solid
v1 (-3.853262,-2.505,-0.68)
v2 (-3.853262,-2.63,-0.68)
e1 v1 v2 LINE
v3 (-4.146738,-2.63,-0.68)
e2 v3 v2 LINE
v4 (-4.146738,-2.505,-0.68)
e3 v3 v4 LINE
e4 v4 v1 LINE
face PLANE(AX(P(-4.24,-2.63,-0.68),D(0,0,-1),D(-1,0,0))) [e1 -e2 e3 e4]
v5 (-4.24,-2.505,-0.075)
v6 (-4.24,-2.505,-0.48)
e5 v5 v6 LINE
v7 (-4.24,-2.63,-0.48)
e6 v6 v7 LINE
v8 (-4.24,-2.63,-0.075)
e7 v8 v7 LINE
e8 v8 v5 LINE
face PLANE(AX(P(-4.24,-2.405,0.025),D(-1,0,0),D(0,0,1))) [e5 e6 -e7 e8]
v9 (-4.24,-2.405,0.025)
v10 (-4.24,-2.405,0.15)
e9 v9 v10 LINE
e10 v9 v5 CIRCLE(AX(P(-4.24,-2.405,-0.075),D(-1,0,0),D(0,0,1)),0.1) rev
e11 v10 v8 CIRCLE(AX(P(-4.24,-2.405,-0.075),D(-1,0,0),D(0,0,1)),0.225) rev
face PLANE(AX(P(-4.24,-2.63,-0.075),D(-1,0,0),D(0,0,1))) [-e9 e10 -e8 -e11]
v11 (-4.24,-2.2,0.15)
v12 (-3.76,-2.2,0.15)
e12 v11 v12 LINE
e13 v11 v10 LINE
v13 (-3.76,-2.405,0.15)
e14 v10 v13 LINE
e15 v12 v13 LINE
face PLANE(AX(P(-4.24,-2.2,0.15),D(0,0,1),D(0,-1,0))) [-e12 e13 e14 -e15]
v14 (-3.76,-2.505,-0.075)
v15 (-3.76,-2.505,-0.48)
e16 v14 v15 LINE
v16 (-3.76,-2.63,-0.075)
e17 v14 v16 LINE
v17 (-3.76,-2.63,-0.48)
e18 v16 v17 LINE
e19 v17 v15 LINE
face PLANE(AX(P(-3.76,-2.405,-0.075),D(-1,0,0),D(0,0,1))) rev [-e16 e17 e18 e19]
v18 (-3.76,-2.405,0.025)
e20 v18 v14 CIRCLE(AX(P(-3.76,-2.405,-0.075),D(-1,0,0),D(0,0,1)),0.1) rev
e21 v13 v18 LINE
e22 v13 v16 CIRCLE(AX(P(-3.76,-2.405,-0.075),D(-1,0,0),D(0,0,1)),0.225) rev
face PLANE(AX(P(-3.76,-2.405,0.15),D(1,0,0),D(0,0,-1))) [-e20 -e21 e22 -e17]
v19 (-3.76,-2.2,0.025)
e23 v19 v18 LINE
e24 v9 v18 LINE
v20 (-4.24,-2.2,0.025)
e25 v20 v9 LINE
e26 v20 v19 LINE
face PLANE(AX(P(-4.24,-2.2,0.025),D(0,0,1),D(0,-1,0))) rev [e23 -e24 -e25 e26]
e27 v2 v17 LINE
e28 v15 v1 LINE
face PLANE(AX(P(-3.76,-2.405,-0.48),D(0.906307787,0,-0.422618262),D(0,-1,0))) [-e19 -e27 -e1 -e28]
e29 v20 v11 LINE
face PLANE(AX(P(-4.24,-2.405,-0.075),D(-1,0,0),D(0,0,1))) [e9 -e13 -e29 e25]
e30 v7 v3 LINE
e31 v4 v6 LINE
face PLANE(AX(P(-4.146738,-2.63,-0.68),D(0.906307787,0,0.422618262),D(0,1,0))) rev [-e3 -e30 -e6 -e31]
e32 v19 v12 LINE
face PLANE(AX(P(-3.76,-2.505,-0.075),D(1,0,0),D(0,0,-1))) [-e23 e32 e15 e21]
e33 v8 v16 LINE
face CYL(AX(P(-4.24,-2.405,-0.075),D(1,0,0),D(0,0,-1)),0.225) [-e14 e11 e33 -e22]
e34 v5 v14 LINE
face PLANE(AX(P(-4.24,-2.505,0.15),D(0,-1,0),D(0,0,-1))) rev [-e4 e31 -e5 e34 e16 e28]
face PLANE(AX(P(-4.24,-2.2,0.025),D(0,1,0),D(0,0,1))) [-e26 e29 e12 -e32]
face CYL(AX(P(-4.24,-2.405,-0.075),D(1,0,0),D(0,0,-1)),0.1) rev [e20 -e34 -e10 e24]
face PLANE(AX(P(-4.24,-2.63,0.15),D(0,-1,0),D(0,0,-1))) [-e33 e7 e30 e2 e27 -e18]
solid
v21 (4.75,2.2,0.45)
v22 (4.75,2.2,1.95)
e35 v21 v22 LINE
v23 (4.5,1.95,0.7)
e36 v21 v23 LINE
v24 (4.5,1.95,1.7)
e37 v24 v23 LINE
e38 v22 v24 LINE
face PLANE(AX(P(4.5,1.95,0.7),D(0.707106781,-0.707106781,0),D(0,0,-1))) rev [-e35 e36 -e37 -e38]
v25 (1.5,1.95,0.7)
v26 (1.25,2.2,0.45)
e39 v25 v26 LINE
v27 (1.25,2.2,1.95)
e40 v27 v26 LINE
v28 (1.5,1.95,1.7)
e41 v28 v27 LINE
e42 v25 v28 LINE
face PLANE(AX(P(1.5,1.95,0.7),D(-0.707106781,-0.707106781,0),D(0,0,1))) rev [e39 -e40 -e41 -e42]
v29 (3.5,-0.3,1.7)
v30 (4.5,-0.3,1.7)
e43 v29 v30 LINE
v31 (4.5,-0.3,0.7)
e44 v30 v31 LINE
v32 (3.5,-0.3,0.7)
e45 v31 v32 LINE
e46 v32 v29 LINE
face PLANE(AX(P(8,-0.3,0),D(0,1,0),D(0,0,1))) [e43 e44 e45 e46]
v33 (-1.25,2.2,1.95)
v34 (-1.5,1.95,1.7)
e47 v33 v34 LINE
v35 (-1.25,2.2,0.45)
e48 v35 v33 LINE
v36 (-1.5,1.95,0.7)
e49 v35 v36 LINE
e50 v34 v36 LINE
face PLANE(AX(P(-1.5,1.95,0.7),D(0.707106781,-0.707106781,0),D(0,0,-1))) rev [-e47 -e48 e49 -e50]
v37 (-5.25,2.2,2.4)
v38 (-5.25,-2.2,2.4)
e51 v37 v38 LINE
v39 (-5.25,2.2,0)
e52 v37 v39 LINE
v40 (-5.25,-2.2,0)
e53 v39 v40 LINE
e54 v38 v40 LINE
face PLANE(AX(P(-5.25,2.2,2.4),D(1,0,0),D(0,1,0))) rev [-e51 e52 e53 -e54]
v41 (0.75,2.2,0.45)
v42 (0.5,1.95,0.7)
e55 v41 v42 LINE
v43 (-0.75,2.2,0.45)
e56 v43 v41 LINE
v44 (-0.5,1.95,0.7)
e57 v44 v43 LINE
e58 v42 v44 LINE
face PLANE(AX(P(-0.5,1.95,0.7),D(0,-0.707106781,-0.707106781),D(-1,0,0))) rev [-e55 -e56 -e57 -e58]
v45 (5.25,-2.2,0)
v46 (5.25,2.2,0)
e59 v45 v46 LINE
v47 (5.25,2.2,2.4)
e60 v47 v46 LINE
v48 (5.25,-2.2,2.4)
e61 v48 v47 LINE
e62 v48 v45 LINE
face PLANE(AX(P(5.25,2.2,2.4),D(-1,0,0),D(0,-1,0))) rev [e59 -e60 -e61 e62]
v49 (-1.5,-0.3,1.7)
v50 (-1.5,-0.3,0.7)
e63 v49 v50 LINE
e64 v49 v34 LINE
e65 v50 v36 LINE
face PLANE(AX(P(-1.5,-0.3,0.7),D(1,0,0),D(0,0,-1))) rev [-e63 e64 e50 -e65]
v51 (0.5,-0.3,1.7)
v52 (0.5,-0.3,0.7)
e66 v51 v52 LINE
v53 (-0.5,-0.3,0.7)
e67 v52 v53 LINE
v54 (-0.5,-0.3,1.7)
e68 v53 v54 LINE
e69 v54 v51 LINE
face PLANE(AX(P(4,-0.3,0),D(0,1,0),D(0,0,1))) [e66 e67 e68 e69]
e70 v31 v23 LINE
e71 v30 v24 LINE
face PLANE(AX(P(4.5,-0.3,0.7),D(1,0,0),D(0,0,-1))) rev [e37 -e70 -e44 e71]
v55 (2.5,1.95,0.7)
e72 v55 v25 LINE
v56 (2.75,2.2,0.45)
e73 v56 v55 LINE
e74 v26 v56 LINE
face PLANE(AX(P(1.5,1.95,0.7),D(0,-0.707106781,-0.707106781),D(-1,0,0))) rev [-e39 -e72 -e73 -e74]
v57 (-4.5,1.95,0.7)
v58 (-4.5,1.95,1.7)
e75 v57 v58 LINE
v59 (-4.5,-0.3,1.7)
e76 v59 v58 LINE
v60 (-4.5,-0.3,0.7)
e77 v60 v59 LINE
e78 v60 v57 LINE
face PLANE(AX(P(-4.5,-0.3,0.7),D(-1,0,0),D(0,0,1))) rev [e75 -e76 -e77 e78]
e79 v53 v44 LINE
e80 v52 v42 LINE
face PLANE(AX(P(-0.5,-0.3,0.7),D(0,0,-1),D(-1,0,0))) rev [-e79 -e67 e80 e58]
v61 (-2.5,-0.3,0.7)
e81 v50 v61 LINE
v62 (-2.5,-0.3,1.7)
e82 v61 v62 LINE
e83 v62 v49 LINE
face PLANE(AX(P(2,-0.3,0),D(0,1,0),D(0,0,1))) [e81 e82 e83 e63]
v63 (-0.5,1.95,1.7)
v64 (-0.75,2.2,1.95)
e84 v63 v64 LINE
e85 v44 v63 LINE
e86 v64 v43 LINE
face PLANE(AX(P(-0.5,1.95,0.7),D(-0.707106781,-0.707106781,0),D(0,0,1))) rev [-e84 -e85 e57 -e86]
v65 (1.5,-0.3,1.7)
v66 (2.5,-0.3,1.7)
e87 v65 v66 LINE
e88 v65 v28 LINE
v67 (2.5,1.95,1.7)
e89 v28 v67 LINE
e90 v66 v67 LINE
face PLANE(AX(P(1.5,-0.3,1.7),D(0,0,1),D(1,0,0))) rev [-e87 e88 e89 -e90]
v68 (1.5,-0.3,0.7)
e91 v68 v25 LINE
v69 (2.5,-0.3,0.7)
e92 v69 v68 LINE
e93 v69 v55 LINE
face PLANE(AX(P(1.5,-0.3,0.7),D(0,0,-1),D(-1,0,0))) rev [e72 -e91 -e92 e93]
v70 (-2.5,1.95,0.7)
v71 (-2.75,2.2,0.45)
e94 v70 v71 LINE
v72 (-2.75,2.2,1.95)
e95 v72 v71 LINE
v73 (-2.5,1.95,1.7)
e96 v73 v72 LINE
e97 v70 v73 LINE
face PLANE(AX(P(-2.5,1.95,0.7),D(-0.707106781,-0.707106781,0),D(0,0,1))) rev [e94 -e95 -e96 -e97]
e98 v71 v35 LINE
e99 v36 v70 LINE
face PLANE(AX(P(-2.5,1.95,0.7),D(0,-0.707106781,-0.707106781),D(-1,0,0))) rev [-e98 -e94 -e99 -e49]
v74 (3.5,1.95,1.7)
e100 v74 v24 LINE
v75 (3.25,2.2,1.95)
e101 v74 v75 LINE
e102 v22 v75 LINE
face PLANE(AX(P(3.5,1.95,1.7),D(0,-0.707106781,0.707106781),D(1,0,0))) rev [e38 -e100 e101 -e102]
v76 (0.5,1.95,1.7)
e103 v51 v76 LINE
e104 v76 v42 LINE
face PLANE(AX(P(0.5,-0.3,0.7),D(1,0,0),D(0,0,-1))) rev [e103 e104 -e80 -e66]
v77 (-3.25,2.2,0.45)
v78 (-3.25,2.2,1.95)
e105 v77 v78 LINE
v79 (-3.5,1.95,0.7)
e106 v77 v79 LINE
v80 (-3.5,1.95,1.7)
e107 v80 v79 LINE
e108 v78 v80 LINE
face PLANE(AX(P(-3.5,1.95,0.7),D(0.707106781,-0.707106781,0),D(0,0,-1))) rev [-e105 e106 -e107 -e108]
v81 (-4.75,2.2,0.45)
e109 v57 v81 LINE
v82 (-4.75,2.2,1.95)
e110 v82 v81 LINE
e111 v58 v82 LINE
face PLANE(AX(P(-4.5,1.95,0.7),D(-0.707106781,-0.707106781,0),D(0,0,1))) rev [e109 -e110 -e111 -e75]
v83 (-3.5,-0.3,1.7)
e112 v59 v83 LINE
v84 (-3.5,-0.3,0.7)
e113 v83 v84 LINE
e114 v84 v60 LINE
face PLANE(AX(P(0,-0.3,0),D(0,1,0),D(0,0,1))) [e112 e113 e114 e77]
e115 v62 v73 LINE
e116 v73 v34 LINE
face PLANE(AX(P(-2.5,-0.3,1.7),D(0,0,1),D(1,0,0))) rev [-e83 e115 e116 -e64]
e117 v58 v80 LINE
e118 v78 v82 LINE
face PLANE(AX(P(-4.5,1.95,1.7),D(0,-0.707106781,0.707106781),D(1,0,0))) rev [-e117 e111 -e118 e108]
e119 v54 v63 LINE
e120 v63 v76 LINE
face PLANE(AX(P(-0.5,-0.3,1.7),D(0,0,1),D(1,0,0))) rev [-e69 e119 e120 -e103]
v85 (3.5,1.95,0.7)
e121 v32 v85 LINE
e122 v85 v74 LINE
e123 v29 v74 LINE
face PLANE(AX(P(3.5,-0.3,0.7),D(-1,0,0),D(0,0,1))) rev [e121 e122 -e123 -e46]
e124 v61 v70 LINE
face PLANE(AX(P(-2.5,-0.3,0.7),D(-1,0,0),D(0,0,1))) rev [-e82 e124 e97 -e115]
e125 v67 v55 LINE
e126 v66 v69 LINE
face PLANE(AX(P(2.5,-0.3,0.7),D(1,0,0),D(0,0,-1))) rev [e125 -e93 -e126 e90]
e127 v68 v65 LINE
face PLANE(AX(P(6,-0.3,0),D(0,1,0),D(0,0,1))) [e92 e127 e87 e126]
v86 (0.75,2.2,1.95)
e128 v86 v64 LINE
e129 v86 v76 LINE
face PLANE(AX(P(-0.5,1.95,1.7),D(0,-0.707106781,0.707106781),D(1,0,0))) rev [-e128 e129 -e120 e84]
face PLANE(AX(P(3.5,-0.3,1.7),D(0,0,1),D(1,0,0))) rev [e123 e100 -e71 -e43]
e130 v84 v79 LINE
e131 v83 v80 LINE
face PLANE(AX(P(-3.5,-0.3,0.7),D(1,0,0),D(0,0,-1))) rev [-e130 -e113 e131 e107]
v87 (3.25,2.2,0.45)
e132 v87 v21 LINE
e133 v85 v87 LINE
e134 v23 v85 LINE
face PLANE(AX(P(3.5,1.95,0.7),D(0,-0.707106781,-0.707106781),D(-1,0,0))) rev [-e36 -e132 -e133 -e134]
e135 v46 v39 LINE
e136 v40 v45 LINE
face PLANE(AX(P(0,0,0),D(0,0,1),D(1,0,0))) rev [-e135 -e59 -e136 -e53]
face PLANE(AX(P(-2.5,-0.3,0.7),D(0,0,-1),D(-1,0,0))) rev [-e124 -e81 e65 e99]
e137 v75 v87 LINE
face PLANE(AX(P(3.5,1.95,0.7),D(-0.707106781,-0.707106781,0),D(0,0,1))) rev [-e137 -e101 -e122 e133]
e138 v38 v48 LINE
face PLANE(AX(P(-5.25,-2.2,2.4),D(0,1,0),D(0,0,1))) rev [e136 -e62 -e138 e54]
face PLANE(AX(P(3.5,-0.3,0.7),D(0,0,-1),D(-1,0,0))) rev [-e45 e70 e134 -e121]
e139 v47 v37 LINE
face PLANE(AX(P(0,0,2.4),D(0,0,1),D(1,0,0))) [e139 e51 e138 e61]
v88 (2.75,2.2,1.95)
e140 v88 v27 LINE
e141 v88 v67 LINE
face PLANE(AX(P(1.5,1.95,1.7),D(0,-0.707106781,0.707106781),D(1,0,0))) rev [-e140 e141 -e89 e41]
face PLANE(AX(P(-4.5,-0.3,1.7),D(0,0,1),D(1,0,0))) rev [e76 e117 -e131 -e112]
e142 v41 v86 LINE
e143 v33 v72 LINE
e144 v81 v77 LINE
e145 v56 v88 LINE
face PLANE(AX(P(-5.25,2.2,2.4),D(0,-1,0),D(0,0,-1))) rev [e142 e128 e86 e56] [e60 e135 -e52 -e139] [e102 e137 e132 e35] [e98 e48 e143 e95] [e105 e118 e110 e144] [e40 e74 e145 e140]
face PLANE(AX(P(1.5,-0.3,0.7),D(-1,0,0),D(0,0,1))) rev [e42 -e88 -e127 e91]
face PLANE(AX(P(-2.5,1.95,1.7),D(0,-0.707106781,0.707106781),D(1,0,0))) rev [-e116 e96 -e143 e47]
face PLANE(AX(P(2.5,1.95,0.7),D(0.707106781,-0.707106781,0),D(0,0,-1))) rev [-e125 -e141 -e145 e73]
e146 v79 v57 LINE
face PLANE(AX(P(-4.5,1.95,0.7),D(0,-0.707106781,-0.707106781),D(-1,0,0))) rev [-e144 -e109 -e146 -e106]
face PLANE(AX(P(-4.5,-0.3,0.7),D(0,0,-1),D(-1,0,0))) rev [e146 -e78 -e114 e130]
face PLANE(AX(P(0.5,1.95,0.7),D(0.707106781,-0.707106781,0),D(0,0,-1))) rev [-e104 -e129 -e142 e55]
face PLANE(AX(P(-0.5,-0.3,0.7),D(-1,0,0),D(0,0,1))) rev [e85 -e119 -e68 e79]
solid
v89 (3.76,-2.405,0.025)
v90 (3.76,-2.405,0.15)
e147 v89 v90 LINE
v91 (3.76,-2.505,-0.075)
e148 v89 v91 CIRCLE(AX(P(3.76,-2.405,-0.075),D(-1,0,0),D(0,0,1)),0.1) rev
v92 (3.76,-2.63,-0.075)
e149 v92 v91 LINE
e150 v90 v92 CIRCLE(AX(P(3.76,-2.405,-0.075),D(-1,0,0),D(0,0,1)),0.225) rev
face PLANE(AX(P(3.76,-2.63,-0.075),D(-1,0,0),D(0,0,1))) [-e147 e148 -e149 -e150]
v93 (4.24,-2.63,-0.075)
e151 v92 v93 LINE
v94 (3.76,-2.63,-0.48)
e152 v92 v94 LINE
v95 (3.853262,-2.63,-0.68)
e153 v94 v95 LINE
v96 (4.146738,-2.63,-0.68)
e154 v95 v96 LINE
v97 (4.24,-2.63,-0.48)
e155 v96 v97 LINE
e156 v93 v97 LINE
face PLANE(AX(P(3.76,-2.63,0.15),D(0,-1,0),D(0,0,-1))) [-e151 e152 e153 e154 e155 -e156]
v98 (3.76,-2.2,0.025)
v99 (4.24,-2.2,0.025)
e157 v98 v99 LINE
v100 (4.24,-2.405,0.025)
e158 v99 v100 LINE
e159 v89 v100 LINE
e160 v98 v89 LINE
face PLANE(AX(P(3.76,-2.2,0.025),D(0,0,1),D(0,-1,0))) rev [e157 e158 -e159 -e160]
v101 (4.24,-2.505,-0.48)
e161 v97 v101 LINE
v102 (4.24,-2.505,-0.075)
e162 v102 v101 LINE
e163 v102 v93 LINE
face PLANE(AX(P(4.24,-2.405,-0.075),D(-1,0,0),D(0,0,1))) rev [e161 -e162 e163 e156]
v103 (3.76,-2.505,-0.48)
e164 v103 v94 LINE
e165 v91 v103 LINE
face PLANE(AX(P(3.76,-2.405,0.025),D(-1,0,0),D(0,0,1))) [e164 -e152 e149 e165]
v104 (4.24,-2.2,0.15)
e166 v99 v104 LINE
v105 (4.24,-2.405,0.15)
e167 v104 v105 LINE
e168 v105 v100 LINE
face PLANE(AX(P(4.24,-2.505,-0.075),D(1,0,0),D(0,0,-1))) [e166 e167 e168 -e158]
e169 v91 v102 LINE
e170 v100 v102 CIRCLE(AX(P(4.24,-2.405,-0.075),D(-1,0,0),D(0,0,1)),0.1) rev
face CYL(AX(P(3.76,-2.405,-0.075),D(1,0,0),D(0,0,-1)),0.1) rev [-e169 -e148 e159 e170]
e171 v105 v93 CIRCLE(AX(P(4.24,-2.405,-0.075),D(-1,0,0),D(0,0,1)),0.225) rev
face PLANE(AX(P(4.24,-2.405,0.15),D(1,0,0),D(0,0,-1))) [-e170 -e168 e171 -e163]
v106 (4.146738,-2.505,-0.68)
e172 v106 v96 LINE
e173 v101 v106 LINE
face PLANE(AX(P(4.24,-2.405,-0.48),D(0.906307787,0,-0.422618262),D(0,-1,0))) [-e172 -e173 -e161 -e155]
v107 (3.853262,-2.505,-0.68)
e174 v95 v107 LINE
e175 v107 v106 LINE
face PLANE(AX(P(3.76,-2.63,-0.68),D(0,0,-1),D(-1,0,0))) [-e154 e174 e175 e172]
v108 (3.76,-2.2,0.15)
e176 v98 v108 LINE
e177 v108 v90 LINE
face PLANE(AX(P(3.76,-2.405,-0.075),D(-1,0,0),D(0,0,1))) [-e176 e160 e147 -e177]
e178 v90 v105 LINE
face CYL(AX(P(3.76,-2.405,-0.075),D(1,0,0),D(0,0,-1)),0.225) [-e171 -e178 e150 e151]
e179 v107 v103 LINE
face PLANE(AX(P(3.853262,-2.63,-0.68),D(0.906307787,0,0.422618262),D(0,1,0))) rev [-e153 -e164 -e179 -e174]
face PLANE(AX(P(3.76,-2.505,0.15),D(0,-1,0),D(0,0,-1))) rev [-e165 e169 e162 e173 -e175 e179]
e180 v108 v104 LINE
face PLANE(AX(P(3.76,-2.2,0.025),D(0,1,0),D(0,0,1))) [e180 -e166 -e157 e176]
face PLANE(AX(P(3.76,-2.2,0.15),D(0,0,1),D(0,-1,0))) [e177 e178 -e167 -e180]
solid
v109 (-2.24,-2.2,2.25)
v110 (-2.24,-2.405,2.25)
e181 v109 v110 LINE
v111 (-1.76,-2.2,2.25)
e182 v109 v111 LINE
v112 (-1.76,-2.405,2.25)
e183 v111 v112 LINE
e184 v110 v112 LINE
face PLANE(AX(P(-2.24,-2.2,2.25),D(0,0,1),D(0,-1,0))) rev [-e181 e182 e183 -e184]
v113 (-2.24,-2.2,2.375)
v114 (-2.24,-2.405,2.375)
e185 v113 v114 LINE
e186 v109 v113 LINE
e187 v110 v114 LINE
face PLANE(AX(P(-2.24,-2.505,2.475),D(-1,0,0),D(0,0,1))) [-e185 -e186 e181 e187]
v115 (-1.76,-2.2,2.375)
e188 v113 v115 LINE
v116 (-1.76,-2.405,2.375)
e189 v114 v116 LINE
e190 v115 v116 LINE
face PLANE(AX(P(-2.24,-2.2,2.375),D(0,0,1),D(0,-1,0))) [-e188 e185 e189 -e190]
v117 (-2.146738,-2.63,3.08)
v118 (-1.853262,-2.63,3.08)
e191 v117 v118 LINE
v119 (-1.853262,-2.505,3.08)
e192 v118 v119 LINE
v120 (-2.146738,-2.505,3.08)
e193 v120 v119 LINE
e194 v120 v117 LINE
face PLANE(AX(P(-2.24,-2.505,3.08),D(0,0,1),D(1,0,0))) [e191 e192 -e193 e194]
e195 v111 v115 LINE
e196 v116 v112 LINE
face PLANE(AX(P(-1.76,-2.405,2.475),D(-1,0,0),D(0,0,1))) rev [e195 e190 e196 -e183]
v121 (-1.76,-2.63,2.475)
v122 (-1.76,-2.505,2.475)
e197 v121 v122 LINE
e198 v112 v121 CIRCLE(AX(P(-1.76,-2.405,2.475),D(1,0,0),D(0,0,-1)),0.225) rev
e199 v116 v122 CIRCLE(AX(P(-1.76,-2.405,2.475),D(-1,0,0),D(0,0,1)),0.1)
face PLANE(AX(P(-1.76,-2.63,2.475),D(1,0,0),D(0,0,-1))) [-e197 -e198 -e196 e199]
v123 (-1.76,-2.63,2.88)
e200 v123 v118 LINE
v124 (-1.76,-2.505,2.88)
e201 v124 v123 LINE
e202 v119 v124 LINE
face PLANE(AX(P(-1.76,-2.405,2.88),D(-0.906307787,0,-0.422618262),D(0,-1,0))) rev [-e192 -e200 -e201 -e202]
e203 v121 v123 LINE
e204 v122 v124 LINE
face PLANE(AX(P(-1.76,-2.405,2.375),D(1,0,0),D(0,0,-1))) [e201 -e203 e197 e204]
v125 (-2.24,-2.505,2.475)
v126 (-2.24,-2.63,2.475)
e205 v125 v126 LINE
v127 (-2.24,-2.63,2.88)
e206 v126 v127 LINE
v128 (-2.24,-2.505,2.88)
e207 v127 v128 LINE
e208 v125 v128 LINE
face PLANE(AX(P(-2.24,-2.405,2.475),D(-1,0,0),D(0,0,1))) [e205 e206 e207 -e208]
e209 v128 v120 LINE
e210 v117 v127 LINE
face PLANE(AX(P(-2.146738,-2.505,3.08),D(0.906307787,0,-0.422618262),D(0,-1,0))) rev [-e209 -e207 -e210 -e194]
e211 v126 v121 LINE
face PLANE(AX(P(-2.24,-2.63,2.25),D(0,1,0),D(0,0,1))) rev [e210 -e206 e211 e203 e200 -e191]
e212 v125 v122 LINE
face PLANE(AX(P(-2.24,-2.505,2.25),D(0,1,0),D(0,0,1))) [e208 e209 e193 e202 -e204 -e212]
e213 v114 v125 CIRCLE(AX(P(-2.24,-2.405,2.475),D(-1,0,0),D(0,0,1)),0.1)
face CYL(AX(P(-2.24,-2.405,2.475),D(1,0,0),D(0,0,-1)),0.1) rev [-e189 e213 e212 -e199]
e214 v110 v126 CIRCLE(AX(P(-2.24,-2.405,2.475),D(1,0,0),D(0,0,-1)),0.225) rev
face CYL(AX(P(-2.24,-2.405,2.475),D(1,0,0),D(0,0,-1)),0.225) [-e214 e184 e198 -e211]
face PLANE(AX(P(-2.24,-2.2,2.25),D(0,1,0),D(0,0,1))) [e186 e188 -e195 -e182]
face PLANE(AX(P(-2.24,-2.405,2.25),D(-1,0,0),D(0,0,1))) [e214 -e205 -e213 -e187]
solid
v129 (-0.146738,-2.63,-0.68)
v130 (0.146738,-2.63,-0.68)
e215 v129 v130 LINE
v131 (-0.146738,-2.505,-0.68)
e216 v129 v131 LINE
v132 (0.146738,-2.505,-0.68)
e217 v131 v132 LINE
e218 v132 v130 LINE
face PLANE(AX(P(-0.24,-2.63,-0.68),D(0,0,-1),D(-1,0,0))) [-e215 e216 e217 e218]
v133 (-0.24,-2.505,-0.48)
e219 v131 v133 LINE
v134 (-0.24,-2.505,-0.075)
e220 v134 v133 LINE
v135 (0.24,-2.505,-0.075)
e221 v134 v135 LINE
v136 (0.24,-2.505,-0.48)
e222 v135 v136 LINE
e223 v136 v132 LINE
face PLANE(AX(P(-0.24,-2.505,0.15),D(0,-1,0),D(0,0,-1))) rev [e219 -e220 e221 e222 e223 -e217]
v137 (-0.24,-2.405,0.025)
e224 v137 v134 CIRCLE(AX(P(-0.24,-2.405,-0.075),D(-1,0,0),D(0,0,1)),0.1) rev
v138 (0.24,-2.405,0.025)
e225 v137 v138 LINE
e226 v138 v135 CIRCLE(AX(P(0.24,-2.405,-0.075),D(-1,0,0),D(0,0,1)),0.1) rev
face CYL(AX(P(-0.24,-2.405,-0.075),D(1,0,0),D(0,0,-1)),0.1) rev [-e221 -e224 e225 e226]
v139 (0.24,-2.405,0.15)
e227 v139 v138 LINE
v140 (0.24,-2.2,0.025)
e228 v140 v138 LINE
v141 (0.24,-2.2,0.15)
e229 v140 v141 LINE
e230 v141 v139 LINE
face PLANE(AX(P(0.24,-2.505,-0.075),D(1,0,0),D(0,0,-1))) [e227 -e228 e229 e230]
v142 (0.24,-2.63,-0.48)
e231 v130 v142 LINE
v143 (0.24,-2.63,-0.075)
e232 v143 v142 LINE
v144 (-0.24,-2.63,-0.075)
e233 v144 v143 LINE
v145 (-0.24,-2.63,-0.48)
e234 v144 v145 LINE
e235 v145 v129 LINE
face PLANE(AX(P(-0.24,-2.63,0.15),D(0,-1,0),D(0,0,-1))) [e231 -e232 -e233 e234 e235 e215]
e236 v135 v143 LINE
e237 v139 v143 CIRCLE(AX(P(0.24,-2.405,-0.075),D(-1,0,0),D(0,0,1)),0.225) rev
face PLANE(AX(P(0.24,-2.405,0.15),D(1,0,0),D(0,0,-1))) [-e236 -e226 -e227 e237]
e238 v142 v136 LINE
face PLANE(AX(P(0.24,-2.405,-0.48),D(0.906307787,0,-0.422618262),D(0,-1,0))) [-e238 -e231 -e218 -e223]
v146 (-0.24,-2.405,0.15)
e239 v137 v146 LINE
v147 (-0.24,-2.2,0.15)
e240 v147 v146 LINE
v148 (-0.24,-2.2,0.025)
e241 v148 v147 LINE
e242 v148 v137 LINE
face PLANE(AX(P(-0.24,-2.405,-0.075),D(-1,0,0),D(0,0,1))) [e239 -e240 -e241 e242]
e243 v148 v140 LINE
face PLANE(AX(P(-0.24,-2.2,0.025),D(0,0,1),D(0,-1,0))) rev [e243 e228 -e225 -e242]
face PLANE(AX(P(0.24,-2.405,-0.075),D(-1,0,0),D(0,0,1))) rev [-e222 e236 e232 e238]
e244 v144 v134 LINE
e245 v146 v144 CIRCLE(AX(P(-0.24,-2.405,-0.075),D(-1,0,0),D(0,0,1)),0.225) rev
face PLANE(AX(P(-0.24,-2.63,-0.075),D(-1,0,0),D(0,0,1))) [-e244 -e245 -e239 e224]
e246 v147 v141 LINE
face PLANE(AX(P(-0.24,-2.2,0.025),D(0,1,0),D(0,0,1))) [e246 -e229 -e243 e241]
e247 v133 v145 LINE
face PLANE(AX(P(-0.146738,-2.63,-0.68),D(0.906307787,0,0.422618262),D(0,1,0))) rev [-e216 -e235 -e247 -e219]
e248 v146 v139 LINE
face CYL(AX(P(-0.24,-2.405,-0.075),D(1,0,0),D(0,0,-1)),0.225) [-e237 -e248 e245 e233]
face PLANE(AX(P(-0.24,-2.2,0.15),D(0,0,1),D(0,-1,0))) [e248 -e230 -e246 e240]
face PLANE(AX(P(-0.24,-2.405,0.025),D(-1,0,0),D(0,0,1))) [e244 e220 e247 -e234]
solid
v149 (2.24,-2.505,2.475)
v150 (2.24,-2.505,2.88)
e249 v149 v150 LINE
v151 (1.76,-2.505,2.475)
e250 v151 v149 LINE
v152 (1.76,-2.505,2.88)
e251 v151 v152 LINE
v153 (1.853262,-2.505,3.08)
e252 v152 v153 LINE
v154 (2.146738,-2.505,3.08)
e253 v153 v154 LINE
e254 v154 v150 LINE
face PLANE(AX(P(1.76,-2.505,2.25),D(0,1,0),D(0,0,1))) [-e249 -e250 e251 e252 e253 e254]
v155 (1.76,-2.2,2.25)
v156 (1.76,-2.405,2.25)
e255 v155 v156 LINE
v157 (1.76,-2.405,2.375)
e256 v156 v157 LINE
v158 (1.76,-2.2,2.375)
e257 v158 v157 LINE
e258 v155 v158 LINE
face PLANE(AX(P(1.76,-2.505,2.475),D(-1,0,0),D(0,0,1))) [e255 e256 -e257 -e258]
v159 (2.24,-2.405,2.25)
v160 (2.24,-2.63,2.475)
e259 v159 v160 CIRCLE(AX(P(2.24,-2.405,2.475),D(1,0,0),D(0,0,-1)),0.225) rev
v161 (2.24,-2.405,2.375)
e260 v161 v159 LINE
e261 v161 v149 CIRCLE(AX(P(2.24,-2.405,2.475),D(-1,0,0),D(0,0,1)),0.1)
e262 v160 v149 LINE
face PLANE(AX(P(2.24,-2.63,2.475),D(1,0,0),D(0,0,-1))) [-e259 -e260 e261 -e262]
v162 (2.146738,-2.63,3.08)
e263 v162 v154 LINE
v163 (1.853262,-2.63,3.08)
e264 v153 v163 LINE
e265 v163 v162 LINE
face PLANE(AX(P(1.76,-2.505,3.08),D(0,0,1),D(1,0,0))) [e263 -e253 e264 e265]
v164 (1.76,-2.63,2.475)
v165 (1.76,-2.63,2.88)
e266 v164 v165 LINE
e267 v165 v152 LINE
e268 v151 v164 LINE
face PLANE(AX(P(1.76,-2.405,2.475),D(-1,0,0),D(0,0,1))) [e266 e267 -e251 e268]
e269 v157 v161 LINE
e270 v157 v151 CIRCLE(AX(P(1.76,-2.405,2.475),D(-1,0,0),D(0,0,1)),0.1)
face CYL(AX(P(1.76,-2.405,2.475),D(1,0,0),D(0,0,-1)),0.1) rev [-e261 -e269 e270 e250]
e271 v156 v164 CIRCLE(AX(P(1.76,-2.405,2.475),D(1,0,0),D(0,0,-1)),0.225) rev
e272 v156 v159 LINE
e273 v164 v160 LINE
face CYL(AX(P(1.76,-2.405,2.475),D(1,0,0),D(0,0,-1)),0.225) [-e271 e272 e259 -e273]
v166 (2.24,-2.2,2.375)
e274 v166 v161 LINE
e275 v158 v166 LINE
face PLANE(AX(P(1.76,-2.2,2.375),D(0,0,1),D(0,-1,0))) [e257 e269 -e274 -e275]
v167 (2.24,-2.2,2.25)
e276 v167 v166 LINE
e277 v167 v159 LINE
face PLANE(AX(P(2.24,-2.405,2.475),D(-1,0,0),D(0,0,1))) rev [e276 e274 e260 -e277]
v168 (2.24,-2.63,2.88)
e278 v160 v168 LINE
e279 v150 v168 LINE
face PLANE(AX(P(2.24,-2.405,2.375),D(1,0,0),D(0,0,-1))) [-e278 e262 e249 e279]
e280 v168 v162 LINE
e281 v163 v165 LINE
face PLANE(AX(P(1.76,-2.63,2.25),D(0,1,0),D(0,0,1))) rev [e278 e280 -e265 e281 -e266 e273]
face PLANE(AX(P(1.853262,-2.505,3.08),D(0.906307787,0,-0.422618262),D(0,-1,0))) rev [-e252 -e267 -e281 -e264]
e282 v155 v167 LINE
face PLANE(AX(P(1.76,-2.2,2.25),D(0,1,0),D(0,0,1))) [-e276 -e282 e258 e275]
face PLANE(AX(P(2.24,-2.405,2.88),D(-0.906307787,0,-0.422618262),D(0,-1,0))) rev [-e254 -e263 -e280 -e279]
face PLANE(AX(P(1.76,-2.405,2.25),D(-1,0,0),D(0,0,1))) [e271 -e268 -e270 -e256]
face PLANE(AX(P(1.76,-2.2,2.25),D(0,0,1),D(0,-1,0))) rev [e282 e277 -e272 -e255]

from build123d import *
from OCP.BRepFilletAPI import BRepFilletAPI_MakeChamfer

# Parameters (mm, degrees)
SKETCH1_W                  = 10.5
SKETCH1_H                  = 4.4
BOSS_EXTRUDE1_DEPTH        = 2.4
SKETCH2_W                  = 1
SKETCH2_H                  = 1
CUT_EXTRUDE1_DEPTH         = 2.5
CHAMFER1_SIZE              = 0.25
LPATTERN6_COUNT            = 5
LPATTERN6_PITCH            = 2
CHAMFER1_OF_LPATTERN6_SIZE = 0.25
BASE_FLANGE2_DEPTH         = 0.24
BASE_FLANGE2_DEPTH_BACK    = 0.24
BASE_FLANGE3_DEPTH         = 0.24
BASE_FLANGE3_DEPTH_BACK    = 0.24
CHAMFER3_SIZE              = 0.2
CHAMFER3_SIZE2             = 0.093261532
CHAMFER4_SIZE              = 0.2
CHAMFER4_SIZE2             = 0.093261532
LPATTERN4_COUNT            = 3
LPATTERN4_PITCH            = 4
LPATTERN3_COUNT            = 2
LPATTERN3_PITCH            = 4


# Sheet-metal steps are written as plain solids
with BuildPart() as part:
    # Sketch1 → Boss-Extrude1 (new body)
    with BuildSketch(Plane.XY):
        Rectangle(SKETCH1_W, SKETCH1_H)
    extrude(amount=BOSS_EXTRUDE1_DEPTH)

    # Sketch2 → Cut-Extrude1 (cut)
    with BuildSketch(Plane(origin=(0, 2.2, 0), x_dir=(1, 0, 0), z_dir=(0, 1, 0))):
        with Locations((-4, -1.2)):
            Rectangle(SKETCH2_W, SKETCH2_H)
    cut_extrude1 = extrude(amount=-CUT_EXTRUDE1_DEPTH, mode=Mode.SUBTRACT)

    # Chamfer1
    chamfer1_edges = [part.edges().sort_by_distance(p)[0] for p in [
        (-3.5, 2.2, 1.2),
        (-4, 2.2, 0.7),
        (-4.5, 2.2, 1.2),
        (-4, 2.2, 1.7),
    ]]
    chamfer(chamfer1_edges, length=CHAMFER1_SIZE)

    # LPattern6: Cut-Extrude1 ×5
    with Locations(*[(i * LPATTERN6_PITCH, 0, 0) for i in range(1, LPATTERN6_COUNT)]):
        add(cut_extrude1, mode=Mode.SUBTRACT)

    # Chamfer1 of LPattern6
    chamfer1_of_lpattern6_edges = [part.edges().sort_by_distance(p)[0] for p in [
        (-1.5, 2.2, 1.2),
        (-2, 2.2, 0.7),
        (-2.5, 2.2, 1.2),
        (-2, 2.2, 1.7),
        (0.5, 2.2, 1.2),
        (0, 2.2, 0.7),
        (-0.5, 2.2, 1.2),
        (0, 2.2, 1.7),
        (2.5, 2.2, 1.2),
        (2, 2.2, 0.7),
        (1.5, 2.2, 1.2),
        (2, 2.2, 1.7),
        (4.5, 2.2, 1.2),
        (4, 2.2, 0.7),
        (3.5, 2.2, 1.2),
        (4, 2.2, 1.7),
    ]]
    chamfer(chamfer1_of_lpattern6_edges, length=CHAMFER1_OF_LPATTERN6_SIZE)


with BuildPart() as body_2:
    # Sketch5 → Base-Flange2 (new, two sides: drawn at the far end of the back side and taken through both)
    with BuildSketch(Plane.ZY.offset(4).offset(-BASE_FLANGE2_DEPTH_BACK)):
        with BuildLine():
            Line((0.15, -2.2), (0.15, -2.405))
            ThreePointArc((0.15, -2.405), (0.084099026, -2.564099026), (-0.075, -2.63))
            Line((-0.075, -2.63), (-0.68, -2.63))
            Line((-0.68, -2.63), (-0.68, -2.505))
            Line((-0.68, -2.505), (-0.075, -2.505))
            ThreePointArc((-0.075, -2.505), (-0.004289322, -2.475710678), (0.025, -2.405))
            Line((0.025, -2.405), (0.025, -2.2))
            Line((0.025, -2.2), (0.15, -2.2))
        make_face()
    extrude(amount=BASE_FLANGE2_DEPTH + BASE_FLANGE2_DEPTH_BACK)

    # Chamfer4: one chamfer whose edges measure the first distance from different faces: ONE call of the kernel's chamfer builder (chamfer() names one face for all edges)
    chamfer4_edges_1 = [body_2.edges().sort_by_distance(p)[0] for p in [
        (-3.76, -2.5675, -0.68),
    ]]
    chamfer4_side_1 = [body_2.faces().sort_by_distance(p)[0] for p in [
        (-3.76, -2.3025, 0.034347727),
    ]]
    chamfer4_edges_2 = [body_2.edges().sort_by_distance(p)[0] for p in [
        (-4.24, -2.5675, -0.68),
    ]]
    chamfer4_side_2 = [body_2.faces().sort_by_distance(p)[0] for p in [
        (-4.24, -2.3025, 0.034347727),
    ]]
    chamfer4 = BRepFilletAPI_MakeChamfer(body_2.part.solid().wrapped)
    for e in chamfer4_edges_1:
        chamfer4.Add(CHAMFER4_SIZE, CHAMFER4_SIZE2, e.wrapped, chamfer4_side_1[0].wrapped)  # the first distance lies on this face
    for e in chamfer4_edges_2:
        chamfer4.Add(CHAMFER4_SIZE, CHAMFER4_SIZE2, e.wrapped, chamfer4_side_2[0].wrapped)  # the first distance lies on this face
    add(Compound.cast(chamfer4.Shape()), mode=Mode.REPLACE)


with BuildPart() as body_3:
    # Sketch22 → Base-Flange3 (new, two sides: drawn at the far end of the back side and taken through both)
    with BuildSketch(Plane.ZY.offset(2).offset(-BASE_FLANGE3_DEPTH_BACK)):
        with BuildLine():
            Line((2.25, -2.2), (2.25, -2.405))
            ThreePointArc((2.25, -2.405), (2.315900974, -2.564099026), (2.475, -2.63))
            Line((2.475, -2.63), (3.08, -2.63))
            Line((3.08, -2.63), (3.08, -2.505))
            Line((3.08, -2.505), (2.475, -2.505))
            ThreePointArc((2.475, -2.505), (2.404289322, -2.475710678), (2.375, -2.405))
            Line((2.375, -2.405), (2.375, -2.2))
            Line((2.375, -2.2), (2.25, -2.2))
        make_face()
    extrude(amount=BASE_FLANGE3_DEPTH + BASE_FLANGE3_DEPTH_BACK)

    # Chamfer3: one chamfer whose edges measure the first distance from different faces: ONE call of the kernel's chamfer builder (chamfer() names one face for all edges)
    chamfer3_edges_1 = [body_3.edges().sort_by_distance(p)[0] for p in [
        (-1.76, -2.5675, 3.08),
    ]]
    chamfer3_side_1 = [body_3.faces().sort_by_distance(p)[0] for p in [
        (-1.76, -2.3025, 2.365652273),
    ]]
    chamfer3_edges_2 = [body_3.edges().sort_by_distance(p)[0] for p in [
        (-2.24, -2.5675, 3.08),
    ]]
    chamfer3_side_2 = [body_3.faces().sort_by_distance(p)[0] for p in [
        (-2.24, -2.3025, 2.365652273),
    ]]
    chamfer3 = BRepFilletAPI_MakeChamfer(body_3.part.solid().wrapped)
    for e in chamfer3_edges_1:
        chamfer3.Add(CHAMFER3_SIZE, CHAMFER3_SIZE2, e.wrapped, chamfer3_side_1[0].wrapped)  # the first distance lies on this face
    for e in chamfer3_edges_2:
        chamfer3.Add(CHAMFER3_SIZE, CHAMFER3_SIZE2, e.wrapped, chamfer3_side_2[0].wrapped)  # the first distance lies on this face
    add(Compound.cast(chamfer3.Shape()), mode=Mode.REPLACE)


with BuildPart() as lpattern4_1:
    # LPattern4: pattern copy
    add(body_2.part.moved(Location(Vector(1, 0, 0) * (1 * LPATTERN4_PITCH))))


with BuildPart() as lpattern4_2:
    # LPattern4: pattern copy
    add(body_2.part.moved(Location(Vector(1, 0, 0) * (2 * LPATTERN4_PITCH))))


with BuildPart() as lpattern3_1:
    # LPattern3: pattern copy
    add(body_3.part.moved(Location(Vector(1, 0, 0) * (1 * LPATTERN3_PITCH))))


solid = Compound([part.part, body_2.part, body_3.part, lpattern4_1.part, lpattern4_2.part, lpattern3_1.part])
